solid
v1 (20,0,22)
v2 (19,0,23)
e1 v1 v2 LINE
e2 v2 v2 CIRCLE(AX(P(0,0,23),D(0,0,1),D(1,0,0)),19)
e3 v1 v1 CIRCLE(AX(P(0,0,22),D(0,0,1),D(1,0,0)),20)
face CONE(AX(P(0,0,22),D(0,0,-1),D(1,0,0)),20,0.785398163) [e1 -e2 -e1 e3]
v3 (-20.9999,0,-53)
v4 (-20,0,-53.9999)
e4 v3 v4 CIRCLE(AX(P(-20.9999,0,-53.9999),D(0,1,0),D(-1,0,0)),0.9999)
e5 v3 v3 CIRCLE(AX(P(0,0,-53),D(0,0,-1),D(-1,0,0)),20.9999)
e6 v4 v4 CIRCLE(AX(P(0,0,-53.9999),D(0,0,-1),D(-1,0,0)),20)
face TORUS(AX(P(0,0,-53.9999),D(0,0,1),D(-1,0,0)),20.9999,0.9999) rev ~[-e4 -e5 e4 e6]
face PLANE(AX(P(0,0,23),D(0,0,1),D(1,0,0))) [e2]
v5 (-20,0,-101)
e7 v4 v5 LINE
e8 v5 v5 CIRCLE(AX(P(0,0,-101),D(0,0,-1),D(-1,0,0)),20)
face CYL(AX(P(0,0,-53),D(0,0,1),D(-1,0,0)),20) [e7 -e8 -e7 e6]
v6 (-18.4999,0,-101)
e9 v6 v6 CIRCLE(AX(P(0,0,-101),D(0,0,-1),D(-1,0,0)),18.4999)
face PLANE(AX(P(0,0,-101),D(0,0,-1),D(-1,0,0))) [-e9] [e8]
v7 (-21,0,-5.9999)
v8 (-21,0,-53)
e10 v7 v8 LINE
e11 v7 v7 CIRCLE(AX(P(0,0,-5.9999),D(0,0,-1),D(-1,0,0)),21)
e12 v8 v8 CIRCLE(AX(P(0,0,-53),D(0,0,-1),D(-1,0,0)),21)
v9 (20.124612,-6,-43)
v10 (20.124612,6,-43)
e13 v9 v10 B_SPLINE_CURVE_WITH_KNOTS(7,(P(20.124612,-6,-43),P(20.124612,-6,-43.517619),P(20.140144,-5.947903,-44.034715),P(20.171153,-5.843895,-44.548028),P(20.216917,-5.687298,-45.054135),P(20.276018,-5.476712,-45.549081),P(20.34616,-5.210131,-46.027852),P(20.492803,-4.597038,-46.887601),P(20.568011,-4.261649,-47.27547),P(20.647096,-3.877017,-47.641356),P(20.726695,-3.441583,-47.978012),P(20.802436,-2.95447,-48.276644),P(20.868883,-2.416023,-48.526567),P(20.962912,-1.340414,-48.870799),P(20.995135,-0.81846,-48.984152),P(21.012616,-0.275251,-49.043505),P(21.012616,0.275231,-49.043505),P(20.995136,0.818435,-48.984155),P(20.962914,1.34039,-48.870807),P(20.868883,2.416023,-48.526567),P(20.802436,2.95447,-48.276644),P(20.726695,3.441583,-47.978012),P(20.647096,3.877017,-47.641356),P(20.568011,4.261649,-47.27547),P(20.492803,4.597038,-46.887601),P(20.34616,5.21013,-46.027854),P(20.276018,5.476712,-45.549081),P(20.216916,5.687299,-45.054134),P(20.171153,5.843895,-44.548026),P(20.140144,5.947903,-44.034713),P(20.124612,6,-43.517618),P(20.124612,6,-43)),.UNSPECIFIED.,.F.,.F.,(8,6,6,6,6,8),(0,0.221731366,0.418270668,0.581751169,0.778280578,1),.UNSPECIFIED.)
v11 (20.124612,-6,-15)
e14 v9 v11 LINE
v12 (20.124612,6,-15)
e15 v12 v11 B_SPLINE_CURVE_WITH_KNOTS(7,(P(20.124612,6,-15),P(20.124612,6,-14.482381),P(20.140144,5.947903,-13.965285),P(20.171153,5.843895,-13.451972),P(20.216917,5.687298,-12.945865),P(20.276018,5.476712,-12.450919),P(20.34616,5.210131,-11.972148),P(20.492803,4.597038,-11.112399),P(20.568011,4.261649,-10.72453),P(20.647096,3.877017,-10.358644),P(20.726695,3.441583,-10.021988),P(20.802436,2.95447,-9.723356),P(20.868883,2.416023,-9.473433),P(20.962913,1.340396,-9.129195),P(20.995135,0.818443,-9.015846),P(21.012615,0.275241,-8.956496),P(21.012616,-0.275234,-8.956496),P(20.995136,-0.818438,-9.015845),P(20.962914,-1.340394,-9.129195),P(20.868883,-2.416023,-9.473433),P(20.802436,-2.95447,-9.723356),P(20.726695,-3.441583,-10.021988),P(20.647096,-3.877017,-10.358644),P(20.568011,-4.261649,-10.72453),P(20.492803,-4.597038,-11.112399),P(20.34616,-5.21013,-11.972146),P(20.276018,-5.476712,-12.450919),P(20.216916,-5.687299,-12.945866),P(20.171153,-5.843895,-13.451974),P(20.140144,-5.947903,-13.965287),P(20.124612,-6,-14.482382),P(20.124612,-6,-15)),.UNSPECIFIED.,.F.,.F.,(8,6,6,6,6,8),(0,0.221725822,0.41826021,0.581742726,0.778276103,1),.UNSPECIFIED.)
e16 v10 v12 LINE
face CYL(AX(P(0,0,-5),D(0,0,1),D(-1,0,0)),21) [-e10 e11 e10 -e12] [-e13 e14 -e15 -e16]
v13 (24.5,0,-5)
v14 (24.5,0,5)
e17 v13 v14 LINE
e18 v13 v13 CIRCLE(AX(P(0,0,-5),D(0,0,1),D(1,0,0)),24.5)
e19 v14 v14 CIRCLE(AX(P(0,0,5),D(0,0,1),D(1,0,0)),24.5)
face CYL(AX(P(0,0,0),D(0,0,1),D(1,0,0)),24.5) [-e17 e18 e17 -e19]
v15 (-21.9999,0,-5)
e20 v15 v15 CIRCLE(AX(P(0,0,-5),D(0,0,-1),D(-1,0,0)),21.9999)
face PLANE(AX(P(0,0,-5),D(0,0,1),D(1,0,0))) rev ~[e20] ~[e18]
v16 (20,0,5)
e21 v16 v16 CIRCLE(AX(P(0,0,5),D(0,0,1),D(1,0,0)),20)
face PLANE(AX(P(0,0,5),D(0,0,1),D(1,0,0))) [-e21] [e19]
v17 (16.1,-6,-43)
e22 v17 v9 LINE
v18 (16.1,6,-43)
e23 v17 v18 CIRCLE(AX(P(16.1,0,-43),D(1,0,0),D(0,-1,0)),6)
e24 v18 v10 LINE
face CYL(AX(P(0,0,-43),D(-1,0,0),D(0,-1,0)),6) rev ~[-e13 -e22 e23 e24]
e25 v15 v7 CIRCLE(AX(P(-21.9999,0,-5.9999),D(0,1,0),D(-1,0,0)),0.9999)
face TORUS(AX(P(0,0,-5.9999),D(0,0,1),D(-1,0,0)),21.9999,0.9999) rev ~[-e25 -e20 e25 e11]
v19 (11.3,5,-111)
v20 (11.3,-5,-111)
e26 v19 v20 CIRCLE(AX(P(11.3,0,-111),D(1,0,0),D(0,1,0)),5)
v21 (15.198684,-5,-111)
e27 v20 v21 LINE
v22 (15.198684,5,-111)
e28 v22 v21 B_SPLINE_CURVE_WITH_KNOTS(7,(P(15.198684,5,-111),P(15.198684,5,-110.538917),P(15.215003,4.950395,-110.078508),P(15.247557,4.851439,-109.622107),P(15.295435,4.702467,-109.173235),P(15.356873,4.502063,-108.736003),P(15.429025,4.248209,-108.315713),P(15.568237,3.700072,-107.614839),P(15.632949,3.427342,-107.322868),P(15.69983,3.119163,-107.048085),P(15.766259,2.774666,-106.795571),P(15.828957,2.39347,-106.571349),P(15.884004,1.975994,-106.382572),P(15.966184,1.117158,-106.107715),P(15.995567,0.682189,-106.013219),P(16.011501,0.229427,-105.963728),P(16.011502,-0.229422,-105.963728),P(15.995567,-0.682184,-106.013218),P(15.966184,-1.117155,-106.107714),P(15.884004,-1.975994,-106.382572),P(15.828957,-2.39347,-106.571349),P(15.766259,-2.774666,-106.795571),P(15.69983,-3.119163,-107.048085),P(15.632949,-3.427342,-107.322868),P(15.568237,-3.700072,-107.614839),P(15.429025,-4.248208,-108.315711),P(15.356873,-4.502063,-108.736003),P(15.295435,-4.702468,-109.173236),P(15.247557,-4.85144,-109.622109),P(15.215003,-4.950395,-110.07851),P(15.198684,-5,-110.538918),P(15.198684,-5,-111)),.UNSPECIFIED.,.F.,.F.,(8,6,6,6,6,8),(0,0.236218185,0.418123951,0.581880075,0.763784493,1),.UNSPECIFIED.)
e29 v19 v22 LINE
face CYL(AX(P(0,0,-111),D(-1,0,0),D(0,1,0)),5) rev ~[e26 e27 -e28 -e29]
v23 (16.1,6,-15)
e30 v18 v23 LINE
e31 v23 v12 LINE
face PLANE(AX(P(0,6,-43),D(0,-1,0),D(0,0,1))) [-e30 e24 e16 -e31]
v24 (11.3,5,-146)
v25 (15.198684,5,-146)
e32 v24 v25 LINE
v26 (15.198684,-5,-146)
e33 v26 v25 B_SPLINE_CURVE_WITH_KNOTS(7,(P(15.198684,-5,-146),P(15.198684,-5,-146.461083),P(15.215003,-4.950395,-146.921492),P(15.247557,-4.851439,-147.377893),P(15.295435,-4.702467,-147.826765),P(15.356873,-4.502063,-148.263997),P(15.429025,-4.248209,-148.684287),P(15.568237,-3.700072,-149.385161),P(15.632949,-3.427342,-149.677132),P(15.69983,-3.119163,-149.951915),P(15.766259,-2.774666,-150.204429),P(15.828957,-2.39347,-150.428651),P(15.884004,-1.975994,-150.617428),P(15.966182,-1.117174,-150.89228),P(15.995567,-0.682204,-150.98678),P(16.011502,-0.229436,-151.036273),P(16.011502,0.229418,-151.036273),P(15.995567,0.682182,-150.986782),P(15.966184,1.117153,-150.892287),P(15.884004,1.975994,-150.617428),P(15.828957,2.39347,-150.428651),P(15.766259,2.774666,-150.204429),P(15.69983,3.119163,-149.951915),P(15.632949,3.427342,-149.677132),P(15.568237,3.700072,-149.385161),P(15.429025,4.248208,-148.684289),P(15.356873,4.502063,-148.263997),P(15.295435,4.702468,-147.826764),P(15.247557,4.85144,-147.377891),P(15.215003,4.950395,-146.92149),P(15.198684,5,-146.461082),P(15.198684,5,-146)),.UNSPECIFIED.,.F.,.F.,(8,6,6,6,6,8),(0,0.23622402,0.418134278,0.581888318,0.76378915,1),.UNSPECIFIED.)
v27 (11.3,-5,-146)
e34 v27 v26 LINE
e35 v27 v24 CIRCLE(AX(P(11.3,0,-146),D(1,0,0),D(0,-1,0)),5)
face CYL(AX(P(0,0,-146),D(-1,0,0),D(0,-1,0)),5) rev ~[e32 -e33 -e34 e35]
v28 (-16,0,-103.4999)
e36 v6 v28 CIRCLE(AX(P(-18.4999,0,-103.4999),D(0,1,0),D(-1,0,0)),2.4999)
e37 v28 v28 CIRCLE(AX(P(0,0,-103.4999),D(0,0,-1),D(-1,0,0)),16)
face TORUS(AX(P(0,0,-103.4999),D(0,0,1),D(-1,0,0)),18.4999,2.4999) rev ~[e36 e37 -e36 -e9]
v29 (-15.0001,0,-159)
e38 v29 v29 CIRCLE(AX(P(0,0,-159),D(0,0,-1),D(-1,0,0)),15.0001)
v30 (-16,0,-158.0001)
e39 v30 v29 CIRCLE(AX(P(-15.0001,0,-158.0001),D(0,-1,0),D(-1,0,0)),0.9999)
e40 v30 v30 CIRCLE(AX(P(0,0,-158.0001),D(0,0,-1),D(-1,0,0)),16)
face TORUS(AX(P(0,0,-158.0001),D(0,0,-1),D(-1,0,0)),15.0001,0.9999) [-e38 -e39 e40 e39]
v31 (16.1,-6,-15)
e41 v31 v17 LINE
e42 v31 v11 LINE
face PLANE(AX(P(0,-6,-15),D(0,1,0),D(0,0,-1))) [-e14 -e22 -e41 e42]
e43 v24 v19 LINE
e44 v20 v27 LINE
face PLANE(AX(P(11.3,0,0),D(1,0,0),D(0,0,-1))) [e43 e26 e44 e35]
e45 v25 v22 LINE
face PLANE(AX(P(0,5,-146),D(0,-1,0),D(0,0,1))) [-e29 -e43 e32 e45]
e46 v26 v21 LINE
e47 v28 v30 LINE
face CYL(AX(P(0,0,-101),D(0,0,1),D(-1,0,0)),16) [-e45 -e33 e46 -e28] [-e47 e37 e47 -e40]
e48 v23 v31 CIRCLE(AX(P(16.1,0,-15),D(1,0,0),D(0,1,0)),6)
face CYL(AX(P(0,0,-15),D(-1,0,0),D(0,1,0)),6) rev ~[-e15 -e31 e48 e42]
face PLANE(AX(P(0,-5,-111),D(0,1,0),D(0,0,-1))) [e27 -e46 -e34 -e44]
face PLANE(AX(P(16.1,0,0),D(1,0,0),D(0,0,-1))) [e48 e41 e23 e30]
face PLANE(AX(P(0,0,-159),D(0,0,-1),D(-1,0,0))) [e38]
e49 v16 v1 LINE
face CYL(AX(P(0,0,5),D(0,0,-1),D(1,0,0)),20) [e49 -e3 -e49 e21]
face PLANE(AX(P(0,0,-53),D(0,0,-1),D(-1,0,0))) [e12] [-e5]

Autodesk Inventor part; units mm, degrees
ref_plane "YZ Plane" through (0, 0, 0) normal (1, 0, 0) x (0, 1, 0)
ref_plane "XZ Plane" through (0, 0, 0) normal (0, 1, 0) x (-1, 0, 0)
ref_plane "XY Plane" through (0, 0, 0) normal (0, 0, 1) x (1, 0, 0)
sketch "Náčrt1" plane through (0, 0, 0) normal (0, 0, 1) x (1, 0, 0)
  circle A0 centre (0, 0) radius 24.5
  dimension "d0" = 49
extrude "Vysunutí1" add sketch "Náčrt1" along normal mid plane 10
sketch "Náčrt2" plane through (0, 0, 5) normal (0, 0, 1) x (1, 0, 0)
  circle A0 centre (0, 0) radius 20
  dimension "d3" = 40
extrude "Vysunutí2" add sketch "Náčrt2" along normal blind 18
sketch "Náčrt3" plane through (0, 0, -5) normal (0, 0, -1) x (-1, 0, 0)
  circle A0 centre (0, 0) radius 21
  dimension "d6" = 42
extrude "Vysunutí3" add sketch "Náčrt3" along normal blind 48
sketch "Náčrt4" plane through (0, 0, -53) normal (0, 0, -1) x (-1, 0, 0)
  circle A0 centre (0, 0) radius 20
  dimension "d9" = 40
extrude "Vysunutí4" add sketch "Náčrt4" along normal blind 48
sketch "Náčrt5" plane through (0, 0, -101) normal (0, 0, -1) x (-1, 0, 0)
  circle A0 centre (0, 0) radius 16
  dimension "d12" = 32
extrude "Vysunutí5" add sketch "Náčrt5" along normal blind 58
sketch "Náčrt6" plane through (0, 0, 0) normal (1, 0, 0) x (0, 1, 0)
  line L0 (0, -9) -> (0, -49) construction
  line L1 (-6, -15) -> (-6, -43)
  line L2 (6, -43) -> (6, -15)
  arc A0 (6, -15) -> (-6, -15) centre (0, -15) ccw
  arc A1 (-6, -43) -> (6, -43) centre (0, -43) ccw
  line L3 (-24.5, -5) -> (24.5, -5) projected
  line L4 (0, -195.4) -> (0, 59.4) projected
  line L5 (-21, -53) -> (21, -53) projected
  point P0 (0, 0)
  point P1 (0, -29)
  dimension "d15" = 12
  dimension "d16" = 4
  dimension "d17" = 4
extrude "Vysunutí6" cut sketch "Náčrt6" along normal through all
sketch "Náčrt7" plane through (0, 0, 0) normal (1, 0, 0) x (0, 0, -1)
  line L0 (15, -6) -> (43, -6) projected
  arc A0 (43, -6) -> (43, 6) centre (43, 0) ccw projected
  line L1 (43, 6) -> (15, 6) projected
  arc A1 (15, 6) -> (15, -6) centre (15, 0) ccw projected
  point P0 (0, 0)
extrude "Vysunutí7" add sketch "Náčrt7" along normal blind 16.1 and the other way blind 18.55
sketch "Náčrt8" plane through (0, 0, 0) normal (1, 0, 0) x (0, 1, 0)
  line L0 (0, -195.4) -> (0, 59.4) projected
  line L1 (0, -106) -> (0, -151) construction
  line L2 (-5, -111) -> (-5, -146)
  line L3 (5, -146) -> (5, -111)
  arc A0 (5, -111) -> (-5, -111) centre (0, -111) ccw
  arc A1 (-5, -146) -> (5, -146) centre (0, -146) ccw
  line L4 (-20, -101) -> (20, -101) projected
  point P0 (0, 0)
  point P1 (0, -128.5)
  dimension "d24" = 10
  dimension "d25" = 5
  dimension "d26" = 35
extrude "Vysunutí8" cut sketch "Náčrt8" along normal through all
sketch "Náčrt9" plane through (0, 0, 0) normal (1, 0, 0) x (0, 0, -1)
  line L0 (111, -5) -> (146, -5) projected
  arc A0 (146, -5) -> (146, 5) centre (146, 0) ccw projected
  line L1 (146, 5) -> (111, 5) projected
  arc A1 (111, 5) -> (111, -5) centre (111, 0) ccw projected
  point P0 (0, 0)
extrude "Vysunutí9" add sketch "Náčrt9" along normal blind 11.3
chamfer "Zkosení1" distance 1 angle 45 1 edges at (-20, 0, 23)
fillet "Zaoblení2" radius 1 3 edges at (21, 0, -5) (20, 0, -53) (16, 0, -159)
fillet "Zaoblení2" radius 2.5 1 edges at (16, 0, -101)
properties part number "hridel"
